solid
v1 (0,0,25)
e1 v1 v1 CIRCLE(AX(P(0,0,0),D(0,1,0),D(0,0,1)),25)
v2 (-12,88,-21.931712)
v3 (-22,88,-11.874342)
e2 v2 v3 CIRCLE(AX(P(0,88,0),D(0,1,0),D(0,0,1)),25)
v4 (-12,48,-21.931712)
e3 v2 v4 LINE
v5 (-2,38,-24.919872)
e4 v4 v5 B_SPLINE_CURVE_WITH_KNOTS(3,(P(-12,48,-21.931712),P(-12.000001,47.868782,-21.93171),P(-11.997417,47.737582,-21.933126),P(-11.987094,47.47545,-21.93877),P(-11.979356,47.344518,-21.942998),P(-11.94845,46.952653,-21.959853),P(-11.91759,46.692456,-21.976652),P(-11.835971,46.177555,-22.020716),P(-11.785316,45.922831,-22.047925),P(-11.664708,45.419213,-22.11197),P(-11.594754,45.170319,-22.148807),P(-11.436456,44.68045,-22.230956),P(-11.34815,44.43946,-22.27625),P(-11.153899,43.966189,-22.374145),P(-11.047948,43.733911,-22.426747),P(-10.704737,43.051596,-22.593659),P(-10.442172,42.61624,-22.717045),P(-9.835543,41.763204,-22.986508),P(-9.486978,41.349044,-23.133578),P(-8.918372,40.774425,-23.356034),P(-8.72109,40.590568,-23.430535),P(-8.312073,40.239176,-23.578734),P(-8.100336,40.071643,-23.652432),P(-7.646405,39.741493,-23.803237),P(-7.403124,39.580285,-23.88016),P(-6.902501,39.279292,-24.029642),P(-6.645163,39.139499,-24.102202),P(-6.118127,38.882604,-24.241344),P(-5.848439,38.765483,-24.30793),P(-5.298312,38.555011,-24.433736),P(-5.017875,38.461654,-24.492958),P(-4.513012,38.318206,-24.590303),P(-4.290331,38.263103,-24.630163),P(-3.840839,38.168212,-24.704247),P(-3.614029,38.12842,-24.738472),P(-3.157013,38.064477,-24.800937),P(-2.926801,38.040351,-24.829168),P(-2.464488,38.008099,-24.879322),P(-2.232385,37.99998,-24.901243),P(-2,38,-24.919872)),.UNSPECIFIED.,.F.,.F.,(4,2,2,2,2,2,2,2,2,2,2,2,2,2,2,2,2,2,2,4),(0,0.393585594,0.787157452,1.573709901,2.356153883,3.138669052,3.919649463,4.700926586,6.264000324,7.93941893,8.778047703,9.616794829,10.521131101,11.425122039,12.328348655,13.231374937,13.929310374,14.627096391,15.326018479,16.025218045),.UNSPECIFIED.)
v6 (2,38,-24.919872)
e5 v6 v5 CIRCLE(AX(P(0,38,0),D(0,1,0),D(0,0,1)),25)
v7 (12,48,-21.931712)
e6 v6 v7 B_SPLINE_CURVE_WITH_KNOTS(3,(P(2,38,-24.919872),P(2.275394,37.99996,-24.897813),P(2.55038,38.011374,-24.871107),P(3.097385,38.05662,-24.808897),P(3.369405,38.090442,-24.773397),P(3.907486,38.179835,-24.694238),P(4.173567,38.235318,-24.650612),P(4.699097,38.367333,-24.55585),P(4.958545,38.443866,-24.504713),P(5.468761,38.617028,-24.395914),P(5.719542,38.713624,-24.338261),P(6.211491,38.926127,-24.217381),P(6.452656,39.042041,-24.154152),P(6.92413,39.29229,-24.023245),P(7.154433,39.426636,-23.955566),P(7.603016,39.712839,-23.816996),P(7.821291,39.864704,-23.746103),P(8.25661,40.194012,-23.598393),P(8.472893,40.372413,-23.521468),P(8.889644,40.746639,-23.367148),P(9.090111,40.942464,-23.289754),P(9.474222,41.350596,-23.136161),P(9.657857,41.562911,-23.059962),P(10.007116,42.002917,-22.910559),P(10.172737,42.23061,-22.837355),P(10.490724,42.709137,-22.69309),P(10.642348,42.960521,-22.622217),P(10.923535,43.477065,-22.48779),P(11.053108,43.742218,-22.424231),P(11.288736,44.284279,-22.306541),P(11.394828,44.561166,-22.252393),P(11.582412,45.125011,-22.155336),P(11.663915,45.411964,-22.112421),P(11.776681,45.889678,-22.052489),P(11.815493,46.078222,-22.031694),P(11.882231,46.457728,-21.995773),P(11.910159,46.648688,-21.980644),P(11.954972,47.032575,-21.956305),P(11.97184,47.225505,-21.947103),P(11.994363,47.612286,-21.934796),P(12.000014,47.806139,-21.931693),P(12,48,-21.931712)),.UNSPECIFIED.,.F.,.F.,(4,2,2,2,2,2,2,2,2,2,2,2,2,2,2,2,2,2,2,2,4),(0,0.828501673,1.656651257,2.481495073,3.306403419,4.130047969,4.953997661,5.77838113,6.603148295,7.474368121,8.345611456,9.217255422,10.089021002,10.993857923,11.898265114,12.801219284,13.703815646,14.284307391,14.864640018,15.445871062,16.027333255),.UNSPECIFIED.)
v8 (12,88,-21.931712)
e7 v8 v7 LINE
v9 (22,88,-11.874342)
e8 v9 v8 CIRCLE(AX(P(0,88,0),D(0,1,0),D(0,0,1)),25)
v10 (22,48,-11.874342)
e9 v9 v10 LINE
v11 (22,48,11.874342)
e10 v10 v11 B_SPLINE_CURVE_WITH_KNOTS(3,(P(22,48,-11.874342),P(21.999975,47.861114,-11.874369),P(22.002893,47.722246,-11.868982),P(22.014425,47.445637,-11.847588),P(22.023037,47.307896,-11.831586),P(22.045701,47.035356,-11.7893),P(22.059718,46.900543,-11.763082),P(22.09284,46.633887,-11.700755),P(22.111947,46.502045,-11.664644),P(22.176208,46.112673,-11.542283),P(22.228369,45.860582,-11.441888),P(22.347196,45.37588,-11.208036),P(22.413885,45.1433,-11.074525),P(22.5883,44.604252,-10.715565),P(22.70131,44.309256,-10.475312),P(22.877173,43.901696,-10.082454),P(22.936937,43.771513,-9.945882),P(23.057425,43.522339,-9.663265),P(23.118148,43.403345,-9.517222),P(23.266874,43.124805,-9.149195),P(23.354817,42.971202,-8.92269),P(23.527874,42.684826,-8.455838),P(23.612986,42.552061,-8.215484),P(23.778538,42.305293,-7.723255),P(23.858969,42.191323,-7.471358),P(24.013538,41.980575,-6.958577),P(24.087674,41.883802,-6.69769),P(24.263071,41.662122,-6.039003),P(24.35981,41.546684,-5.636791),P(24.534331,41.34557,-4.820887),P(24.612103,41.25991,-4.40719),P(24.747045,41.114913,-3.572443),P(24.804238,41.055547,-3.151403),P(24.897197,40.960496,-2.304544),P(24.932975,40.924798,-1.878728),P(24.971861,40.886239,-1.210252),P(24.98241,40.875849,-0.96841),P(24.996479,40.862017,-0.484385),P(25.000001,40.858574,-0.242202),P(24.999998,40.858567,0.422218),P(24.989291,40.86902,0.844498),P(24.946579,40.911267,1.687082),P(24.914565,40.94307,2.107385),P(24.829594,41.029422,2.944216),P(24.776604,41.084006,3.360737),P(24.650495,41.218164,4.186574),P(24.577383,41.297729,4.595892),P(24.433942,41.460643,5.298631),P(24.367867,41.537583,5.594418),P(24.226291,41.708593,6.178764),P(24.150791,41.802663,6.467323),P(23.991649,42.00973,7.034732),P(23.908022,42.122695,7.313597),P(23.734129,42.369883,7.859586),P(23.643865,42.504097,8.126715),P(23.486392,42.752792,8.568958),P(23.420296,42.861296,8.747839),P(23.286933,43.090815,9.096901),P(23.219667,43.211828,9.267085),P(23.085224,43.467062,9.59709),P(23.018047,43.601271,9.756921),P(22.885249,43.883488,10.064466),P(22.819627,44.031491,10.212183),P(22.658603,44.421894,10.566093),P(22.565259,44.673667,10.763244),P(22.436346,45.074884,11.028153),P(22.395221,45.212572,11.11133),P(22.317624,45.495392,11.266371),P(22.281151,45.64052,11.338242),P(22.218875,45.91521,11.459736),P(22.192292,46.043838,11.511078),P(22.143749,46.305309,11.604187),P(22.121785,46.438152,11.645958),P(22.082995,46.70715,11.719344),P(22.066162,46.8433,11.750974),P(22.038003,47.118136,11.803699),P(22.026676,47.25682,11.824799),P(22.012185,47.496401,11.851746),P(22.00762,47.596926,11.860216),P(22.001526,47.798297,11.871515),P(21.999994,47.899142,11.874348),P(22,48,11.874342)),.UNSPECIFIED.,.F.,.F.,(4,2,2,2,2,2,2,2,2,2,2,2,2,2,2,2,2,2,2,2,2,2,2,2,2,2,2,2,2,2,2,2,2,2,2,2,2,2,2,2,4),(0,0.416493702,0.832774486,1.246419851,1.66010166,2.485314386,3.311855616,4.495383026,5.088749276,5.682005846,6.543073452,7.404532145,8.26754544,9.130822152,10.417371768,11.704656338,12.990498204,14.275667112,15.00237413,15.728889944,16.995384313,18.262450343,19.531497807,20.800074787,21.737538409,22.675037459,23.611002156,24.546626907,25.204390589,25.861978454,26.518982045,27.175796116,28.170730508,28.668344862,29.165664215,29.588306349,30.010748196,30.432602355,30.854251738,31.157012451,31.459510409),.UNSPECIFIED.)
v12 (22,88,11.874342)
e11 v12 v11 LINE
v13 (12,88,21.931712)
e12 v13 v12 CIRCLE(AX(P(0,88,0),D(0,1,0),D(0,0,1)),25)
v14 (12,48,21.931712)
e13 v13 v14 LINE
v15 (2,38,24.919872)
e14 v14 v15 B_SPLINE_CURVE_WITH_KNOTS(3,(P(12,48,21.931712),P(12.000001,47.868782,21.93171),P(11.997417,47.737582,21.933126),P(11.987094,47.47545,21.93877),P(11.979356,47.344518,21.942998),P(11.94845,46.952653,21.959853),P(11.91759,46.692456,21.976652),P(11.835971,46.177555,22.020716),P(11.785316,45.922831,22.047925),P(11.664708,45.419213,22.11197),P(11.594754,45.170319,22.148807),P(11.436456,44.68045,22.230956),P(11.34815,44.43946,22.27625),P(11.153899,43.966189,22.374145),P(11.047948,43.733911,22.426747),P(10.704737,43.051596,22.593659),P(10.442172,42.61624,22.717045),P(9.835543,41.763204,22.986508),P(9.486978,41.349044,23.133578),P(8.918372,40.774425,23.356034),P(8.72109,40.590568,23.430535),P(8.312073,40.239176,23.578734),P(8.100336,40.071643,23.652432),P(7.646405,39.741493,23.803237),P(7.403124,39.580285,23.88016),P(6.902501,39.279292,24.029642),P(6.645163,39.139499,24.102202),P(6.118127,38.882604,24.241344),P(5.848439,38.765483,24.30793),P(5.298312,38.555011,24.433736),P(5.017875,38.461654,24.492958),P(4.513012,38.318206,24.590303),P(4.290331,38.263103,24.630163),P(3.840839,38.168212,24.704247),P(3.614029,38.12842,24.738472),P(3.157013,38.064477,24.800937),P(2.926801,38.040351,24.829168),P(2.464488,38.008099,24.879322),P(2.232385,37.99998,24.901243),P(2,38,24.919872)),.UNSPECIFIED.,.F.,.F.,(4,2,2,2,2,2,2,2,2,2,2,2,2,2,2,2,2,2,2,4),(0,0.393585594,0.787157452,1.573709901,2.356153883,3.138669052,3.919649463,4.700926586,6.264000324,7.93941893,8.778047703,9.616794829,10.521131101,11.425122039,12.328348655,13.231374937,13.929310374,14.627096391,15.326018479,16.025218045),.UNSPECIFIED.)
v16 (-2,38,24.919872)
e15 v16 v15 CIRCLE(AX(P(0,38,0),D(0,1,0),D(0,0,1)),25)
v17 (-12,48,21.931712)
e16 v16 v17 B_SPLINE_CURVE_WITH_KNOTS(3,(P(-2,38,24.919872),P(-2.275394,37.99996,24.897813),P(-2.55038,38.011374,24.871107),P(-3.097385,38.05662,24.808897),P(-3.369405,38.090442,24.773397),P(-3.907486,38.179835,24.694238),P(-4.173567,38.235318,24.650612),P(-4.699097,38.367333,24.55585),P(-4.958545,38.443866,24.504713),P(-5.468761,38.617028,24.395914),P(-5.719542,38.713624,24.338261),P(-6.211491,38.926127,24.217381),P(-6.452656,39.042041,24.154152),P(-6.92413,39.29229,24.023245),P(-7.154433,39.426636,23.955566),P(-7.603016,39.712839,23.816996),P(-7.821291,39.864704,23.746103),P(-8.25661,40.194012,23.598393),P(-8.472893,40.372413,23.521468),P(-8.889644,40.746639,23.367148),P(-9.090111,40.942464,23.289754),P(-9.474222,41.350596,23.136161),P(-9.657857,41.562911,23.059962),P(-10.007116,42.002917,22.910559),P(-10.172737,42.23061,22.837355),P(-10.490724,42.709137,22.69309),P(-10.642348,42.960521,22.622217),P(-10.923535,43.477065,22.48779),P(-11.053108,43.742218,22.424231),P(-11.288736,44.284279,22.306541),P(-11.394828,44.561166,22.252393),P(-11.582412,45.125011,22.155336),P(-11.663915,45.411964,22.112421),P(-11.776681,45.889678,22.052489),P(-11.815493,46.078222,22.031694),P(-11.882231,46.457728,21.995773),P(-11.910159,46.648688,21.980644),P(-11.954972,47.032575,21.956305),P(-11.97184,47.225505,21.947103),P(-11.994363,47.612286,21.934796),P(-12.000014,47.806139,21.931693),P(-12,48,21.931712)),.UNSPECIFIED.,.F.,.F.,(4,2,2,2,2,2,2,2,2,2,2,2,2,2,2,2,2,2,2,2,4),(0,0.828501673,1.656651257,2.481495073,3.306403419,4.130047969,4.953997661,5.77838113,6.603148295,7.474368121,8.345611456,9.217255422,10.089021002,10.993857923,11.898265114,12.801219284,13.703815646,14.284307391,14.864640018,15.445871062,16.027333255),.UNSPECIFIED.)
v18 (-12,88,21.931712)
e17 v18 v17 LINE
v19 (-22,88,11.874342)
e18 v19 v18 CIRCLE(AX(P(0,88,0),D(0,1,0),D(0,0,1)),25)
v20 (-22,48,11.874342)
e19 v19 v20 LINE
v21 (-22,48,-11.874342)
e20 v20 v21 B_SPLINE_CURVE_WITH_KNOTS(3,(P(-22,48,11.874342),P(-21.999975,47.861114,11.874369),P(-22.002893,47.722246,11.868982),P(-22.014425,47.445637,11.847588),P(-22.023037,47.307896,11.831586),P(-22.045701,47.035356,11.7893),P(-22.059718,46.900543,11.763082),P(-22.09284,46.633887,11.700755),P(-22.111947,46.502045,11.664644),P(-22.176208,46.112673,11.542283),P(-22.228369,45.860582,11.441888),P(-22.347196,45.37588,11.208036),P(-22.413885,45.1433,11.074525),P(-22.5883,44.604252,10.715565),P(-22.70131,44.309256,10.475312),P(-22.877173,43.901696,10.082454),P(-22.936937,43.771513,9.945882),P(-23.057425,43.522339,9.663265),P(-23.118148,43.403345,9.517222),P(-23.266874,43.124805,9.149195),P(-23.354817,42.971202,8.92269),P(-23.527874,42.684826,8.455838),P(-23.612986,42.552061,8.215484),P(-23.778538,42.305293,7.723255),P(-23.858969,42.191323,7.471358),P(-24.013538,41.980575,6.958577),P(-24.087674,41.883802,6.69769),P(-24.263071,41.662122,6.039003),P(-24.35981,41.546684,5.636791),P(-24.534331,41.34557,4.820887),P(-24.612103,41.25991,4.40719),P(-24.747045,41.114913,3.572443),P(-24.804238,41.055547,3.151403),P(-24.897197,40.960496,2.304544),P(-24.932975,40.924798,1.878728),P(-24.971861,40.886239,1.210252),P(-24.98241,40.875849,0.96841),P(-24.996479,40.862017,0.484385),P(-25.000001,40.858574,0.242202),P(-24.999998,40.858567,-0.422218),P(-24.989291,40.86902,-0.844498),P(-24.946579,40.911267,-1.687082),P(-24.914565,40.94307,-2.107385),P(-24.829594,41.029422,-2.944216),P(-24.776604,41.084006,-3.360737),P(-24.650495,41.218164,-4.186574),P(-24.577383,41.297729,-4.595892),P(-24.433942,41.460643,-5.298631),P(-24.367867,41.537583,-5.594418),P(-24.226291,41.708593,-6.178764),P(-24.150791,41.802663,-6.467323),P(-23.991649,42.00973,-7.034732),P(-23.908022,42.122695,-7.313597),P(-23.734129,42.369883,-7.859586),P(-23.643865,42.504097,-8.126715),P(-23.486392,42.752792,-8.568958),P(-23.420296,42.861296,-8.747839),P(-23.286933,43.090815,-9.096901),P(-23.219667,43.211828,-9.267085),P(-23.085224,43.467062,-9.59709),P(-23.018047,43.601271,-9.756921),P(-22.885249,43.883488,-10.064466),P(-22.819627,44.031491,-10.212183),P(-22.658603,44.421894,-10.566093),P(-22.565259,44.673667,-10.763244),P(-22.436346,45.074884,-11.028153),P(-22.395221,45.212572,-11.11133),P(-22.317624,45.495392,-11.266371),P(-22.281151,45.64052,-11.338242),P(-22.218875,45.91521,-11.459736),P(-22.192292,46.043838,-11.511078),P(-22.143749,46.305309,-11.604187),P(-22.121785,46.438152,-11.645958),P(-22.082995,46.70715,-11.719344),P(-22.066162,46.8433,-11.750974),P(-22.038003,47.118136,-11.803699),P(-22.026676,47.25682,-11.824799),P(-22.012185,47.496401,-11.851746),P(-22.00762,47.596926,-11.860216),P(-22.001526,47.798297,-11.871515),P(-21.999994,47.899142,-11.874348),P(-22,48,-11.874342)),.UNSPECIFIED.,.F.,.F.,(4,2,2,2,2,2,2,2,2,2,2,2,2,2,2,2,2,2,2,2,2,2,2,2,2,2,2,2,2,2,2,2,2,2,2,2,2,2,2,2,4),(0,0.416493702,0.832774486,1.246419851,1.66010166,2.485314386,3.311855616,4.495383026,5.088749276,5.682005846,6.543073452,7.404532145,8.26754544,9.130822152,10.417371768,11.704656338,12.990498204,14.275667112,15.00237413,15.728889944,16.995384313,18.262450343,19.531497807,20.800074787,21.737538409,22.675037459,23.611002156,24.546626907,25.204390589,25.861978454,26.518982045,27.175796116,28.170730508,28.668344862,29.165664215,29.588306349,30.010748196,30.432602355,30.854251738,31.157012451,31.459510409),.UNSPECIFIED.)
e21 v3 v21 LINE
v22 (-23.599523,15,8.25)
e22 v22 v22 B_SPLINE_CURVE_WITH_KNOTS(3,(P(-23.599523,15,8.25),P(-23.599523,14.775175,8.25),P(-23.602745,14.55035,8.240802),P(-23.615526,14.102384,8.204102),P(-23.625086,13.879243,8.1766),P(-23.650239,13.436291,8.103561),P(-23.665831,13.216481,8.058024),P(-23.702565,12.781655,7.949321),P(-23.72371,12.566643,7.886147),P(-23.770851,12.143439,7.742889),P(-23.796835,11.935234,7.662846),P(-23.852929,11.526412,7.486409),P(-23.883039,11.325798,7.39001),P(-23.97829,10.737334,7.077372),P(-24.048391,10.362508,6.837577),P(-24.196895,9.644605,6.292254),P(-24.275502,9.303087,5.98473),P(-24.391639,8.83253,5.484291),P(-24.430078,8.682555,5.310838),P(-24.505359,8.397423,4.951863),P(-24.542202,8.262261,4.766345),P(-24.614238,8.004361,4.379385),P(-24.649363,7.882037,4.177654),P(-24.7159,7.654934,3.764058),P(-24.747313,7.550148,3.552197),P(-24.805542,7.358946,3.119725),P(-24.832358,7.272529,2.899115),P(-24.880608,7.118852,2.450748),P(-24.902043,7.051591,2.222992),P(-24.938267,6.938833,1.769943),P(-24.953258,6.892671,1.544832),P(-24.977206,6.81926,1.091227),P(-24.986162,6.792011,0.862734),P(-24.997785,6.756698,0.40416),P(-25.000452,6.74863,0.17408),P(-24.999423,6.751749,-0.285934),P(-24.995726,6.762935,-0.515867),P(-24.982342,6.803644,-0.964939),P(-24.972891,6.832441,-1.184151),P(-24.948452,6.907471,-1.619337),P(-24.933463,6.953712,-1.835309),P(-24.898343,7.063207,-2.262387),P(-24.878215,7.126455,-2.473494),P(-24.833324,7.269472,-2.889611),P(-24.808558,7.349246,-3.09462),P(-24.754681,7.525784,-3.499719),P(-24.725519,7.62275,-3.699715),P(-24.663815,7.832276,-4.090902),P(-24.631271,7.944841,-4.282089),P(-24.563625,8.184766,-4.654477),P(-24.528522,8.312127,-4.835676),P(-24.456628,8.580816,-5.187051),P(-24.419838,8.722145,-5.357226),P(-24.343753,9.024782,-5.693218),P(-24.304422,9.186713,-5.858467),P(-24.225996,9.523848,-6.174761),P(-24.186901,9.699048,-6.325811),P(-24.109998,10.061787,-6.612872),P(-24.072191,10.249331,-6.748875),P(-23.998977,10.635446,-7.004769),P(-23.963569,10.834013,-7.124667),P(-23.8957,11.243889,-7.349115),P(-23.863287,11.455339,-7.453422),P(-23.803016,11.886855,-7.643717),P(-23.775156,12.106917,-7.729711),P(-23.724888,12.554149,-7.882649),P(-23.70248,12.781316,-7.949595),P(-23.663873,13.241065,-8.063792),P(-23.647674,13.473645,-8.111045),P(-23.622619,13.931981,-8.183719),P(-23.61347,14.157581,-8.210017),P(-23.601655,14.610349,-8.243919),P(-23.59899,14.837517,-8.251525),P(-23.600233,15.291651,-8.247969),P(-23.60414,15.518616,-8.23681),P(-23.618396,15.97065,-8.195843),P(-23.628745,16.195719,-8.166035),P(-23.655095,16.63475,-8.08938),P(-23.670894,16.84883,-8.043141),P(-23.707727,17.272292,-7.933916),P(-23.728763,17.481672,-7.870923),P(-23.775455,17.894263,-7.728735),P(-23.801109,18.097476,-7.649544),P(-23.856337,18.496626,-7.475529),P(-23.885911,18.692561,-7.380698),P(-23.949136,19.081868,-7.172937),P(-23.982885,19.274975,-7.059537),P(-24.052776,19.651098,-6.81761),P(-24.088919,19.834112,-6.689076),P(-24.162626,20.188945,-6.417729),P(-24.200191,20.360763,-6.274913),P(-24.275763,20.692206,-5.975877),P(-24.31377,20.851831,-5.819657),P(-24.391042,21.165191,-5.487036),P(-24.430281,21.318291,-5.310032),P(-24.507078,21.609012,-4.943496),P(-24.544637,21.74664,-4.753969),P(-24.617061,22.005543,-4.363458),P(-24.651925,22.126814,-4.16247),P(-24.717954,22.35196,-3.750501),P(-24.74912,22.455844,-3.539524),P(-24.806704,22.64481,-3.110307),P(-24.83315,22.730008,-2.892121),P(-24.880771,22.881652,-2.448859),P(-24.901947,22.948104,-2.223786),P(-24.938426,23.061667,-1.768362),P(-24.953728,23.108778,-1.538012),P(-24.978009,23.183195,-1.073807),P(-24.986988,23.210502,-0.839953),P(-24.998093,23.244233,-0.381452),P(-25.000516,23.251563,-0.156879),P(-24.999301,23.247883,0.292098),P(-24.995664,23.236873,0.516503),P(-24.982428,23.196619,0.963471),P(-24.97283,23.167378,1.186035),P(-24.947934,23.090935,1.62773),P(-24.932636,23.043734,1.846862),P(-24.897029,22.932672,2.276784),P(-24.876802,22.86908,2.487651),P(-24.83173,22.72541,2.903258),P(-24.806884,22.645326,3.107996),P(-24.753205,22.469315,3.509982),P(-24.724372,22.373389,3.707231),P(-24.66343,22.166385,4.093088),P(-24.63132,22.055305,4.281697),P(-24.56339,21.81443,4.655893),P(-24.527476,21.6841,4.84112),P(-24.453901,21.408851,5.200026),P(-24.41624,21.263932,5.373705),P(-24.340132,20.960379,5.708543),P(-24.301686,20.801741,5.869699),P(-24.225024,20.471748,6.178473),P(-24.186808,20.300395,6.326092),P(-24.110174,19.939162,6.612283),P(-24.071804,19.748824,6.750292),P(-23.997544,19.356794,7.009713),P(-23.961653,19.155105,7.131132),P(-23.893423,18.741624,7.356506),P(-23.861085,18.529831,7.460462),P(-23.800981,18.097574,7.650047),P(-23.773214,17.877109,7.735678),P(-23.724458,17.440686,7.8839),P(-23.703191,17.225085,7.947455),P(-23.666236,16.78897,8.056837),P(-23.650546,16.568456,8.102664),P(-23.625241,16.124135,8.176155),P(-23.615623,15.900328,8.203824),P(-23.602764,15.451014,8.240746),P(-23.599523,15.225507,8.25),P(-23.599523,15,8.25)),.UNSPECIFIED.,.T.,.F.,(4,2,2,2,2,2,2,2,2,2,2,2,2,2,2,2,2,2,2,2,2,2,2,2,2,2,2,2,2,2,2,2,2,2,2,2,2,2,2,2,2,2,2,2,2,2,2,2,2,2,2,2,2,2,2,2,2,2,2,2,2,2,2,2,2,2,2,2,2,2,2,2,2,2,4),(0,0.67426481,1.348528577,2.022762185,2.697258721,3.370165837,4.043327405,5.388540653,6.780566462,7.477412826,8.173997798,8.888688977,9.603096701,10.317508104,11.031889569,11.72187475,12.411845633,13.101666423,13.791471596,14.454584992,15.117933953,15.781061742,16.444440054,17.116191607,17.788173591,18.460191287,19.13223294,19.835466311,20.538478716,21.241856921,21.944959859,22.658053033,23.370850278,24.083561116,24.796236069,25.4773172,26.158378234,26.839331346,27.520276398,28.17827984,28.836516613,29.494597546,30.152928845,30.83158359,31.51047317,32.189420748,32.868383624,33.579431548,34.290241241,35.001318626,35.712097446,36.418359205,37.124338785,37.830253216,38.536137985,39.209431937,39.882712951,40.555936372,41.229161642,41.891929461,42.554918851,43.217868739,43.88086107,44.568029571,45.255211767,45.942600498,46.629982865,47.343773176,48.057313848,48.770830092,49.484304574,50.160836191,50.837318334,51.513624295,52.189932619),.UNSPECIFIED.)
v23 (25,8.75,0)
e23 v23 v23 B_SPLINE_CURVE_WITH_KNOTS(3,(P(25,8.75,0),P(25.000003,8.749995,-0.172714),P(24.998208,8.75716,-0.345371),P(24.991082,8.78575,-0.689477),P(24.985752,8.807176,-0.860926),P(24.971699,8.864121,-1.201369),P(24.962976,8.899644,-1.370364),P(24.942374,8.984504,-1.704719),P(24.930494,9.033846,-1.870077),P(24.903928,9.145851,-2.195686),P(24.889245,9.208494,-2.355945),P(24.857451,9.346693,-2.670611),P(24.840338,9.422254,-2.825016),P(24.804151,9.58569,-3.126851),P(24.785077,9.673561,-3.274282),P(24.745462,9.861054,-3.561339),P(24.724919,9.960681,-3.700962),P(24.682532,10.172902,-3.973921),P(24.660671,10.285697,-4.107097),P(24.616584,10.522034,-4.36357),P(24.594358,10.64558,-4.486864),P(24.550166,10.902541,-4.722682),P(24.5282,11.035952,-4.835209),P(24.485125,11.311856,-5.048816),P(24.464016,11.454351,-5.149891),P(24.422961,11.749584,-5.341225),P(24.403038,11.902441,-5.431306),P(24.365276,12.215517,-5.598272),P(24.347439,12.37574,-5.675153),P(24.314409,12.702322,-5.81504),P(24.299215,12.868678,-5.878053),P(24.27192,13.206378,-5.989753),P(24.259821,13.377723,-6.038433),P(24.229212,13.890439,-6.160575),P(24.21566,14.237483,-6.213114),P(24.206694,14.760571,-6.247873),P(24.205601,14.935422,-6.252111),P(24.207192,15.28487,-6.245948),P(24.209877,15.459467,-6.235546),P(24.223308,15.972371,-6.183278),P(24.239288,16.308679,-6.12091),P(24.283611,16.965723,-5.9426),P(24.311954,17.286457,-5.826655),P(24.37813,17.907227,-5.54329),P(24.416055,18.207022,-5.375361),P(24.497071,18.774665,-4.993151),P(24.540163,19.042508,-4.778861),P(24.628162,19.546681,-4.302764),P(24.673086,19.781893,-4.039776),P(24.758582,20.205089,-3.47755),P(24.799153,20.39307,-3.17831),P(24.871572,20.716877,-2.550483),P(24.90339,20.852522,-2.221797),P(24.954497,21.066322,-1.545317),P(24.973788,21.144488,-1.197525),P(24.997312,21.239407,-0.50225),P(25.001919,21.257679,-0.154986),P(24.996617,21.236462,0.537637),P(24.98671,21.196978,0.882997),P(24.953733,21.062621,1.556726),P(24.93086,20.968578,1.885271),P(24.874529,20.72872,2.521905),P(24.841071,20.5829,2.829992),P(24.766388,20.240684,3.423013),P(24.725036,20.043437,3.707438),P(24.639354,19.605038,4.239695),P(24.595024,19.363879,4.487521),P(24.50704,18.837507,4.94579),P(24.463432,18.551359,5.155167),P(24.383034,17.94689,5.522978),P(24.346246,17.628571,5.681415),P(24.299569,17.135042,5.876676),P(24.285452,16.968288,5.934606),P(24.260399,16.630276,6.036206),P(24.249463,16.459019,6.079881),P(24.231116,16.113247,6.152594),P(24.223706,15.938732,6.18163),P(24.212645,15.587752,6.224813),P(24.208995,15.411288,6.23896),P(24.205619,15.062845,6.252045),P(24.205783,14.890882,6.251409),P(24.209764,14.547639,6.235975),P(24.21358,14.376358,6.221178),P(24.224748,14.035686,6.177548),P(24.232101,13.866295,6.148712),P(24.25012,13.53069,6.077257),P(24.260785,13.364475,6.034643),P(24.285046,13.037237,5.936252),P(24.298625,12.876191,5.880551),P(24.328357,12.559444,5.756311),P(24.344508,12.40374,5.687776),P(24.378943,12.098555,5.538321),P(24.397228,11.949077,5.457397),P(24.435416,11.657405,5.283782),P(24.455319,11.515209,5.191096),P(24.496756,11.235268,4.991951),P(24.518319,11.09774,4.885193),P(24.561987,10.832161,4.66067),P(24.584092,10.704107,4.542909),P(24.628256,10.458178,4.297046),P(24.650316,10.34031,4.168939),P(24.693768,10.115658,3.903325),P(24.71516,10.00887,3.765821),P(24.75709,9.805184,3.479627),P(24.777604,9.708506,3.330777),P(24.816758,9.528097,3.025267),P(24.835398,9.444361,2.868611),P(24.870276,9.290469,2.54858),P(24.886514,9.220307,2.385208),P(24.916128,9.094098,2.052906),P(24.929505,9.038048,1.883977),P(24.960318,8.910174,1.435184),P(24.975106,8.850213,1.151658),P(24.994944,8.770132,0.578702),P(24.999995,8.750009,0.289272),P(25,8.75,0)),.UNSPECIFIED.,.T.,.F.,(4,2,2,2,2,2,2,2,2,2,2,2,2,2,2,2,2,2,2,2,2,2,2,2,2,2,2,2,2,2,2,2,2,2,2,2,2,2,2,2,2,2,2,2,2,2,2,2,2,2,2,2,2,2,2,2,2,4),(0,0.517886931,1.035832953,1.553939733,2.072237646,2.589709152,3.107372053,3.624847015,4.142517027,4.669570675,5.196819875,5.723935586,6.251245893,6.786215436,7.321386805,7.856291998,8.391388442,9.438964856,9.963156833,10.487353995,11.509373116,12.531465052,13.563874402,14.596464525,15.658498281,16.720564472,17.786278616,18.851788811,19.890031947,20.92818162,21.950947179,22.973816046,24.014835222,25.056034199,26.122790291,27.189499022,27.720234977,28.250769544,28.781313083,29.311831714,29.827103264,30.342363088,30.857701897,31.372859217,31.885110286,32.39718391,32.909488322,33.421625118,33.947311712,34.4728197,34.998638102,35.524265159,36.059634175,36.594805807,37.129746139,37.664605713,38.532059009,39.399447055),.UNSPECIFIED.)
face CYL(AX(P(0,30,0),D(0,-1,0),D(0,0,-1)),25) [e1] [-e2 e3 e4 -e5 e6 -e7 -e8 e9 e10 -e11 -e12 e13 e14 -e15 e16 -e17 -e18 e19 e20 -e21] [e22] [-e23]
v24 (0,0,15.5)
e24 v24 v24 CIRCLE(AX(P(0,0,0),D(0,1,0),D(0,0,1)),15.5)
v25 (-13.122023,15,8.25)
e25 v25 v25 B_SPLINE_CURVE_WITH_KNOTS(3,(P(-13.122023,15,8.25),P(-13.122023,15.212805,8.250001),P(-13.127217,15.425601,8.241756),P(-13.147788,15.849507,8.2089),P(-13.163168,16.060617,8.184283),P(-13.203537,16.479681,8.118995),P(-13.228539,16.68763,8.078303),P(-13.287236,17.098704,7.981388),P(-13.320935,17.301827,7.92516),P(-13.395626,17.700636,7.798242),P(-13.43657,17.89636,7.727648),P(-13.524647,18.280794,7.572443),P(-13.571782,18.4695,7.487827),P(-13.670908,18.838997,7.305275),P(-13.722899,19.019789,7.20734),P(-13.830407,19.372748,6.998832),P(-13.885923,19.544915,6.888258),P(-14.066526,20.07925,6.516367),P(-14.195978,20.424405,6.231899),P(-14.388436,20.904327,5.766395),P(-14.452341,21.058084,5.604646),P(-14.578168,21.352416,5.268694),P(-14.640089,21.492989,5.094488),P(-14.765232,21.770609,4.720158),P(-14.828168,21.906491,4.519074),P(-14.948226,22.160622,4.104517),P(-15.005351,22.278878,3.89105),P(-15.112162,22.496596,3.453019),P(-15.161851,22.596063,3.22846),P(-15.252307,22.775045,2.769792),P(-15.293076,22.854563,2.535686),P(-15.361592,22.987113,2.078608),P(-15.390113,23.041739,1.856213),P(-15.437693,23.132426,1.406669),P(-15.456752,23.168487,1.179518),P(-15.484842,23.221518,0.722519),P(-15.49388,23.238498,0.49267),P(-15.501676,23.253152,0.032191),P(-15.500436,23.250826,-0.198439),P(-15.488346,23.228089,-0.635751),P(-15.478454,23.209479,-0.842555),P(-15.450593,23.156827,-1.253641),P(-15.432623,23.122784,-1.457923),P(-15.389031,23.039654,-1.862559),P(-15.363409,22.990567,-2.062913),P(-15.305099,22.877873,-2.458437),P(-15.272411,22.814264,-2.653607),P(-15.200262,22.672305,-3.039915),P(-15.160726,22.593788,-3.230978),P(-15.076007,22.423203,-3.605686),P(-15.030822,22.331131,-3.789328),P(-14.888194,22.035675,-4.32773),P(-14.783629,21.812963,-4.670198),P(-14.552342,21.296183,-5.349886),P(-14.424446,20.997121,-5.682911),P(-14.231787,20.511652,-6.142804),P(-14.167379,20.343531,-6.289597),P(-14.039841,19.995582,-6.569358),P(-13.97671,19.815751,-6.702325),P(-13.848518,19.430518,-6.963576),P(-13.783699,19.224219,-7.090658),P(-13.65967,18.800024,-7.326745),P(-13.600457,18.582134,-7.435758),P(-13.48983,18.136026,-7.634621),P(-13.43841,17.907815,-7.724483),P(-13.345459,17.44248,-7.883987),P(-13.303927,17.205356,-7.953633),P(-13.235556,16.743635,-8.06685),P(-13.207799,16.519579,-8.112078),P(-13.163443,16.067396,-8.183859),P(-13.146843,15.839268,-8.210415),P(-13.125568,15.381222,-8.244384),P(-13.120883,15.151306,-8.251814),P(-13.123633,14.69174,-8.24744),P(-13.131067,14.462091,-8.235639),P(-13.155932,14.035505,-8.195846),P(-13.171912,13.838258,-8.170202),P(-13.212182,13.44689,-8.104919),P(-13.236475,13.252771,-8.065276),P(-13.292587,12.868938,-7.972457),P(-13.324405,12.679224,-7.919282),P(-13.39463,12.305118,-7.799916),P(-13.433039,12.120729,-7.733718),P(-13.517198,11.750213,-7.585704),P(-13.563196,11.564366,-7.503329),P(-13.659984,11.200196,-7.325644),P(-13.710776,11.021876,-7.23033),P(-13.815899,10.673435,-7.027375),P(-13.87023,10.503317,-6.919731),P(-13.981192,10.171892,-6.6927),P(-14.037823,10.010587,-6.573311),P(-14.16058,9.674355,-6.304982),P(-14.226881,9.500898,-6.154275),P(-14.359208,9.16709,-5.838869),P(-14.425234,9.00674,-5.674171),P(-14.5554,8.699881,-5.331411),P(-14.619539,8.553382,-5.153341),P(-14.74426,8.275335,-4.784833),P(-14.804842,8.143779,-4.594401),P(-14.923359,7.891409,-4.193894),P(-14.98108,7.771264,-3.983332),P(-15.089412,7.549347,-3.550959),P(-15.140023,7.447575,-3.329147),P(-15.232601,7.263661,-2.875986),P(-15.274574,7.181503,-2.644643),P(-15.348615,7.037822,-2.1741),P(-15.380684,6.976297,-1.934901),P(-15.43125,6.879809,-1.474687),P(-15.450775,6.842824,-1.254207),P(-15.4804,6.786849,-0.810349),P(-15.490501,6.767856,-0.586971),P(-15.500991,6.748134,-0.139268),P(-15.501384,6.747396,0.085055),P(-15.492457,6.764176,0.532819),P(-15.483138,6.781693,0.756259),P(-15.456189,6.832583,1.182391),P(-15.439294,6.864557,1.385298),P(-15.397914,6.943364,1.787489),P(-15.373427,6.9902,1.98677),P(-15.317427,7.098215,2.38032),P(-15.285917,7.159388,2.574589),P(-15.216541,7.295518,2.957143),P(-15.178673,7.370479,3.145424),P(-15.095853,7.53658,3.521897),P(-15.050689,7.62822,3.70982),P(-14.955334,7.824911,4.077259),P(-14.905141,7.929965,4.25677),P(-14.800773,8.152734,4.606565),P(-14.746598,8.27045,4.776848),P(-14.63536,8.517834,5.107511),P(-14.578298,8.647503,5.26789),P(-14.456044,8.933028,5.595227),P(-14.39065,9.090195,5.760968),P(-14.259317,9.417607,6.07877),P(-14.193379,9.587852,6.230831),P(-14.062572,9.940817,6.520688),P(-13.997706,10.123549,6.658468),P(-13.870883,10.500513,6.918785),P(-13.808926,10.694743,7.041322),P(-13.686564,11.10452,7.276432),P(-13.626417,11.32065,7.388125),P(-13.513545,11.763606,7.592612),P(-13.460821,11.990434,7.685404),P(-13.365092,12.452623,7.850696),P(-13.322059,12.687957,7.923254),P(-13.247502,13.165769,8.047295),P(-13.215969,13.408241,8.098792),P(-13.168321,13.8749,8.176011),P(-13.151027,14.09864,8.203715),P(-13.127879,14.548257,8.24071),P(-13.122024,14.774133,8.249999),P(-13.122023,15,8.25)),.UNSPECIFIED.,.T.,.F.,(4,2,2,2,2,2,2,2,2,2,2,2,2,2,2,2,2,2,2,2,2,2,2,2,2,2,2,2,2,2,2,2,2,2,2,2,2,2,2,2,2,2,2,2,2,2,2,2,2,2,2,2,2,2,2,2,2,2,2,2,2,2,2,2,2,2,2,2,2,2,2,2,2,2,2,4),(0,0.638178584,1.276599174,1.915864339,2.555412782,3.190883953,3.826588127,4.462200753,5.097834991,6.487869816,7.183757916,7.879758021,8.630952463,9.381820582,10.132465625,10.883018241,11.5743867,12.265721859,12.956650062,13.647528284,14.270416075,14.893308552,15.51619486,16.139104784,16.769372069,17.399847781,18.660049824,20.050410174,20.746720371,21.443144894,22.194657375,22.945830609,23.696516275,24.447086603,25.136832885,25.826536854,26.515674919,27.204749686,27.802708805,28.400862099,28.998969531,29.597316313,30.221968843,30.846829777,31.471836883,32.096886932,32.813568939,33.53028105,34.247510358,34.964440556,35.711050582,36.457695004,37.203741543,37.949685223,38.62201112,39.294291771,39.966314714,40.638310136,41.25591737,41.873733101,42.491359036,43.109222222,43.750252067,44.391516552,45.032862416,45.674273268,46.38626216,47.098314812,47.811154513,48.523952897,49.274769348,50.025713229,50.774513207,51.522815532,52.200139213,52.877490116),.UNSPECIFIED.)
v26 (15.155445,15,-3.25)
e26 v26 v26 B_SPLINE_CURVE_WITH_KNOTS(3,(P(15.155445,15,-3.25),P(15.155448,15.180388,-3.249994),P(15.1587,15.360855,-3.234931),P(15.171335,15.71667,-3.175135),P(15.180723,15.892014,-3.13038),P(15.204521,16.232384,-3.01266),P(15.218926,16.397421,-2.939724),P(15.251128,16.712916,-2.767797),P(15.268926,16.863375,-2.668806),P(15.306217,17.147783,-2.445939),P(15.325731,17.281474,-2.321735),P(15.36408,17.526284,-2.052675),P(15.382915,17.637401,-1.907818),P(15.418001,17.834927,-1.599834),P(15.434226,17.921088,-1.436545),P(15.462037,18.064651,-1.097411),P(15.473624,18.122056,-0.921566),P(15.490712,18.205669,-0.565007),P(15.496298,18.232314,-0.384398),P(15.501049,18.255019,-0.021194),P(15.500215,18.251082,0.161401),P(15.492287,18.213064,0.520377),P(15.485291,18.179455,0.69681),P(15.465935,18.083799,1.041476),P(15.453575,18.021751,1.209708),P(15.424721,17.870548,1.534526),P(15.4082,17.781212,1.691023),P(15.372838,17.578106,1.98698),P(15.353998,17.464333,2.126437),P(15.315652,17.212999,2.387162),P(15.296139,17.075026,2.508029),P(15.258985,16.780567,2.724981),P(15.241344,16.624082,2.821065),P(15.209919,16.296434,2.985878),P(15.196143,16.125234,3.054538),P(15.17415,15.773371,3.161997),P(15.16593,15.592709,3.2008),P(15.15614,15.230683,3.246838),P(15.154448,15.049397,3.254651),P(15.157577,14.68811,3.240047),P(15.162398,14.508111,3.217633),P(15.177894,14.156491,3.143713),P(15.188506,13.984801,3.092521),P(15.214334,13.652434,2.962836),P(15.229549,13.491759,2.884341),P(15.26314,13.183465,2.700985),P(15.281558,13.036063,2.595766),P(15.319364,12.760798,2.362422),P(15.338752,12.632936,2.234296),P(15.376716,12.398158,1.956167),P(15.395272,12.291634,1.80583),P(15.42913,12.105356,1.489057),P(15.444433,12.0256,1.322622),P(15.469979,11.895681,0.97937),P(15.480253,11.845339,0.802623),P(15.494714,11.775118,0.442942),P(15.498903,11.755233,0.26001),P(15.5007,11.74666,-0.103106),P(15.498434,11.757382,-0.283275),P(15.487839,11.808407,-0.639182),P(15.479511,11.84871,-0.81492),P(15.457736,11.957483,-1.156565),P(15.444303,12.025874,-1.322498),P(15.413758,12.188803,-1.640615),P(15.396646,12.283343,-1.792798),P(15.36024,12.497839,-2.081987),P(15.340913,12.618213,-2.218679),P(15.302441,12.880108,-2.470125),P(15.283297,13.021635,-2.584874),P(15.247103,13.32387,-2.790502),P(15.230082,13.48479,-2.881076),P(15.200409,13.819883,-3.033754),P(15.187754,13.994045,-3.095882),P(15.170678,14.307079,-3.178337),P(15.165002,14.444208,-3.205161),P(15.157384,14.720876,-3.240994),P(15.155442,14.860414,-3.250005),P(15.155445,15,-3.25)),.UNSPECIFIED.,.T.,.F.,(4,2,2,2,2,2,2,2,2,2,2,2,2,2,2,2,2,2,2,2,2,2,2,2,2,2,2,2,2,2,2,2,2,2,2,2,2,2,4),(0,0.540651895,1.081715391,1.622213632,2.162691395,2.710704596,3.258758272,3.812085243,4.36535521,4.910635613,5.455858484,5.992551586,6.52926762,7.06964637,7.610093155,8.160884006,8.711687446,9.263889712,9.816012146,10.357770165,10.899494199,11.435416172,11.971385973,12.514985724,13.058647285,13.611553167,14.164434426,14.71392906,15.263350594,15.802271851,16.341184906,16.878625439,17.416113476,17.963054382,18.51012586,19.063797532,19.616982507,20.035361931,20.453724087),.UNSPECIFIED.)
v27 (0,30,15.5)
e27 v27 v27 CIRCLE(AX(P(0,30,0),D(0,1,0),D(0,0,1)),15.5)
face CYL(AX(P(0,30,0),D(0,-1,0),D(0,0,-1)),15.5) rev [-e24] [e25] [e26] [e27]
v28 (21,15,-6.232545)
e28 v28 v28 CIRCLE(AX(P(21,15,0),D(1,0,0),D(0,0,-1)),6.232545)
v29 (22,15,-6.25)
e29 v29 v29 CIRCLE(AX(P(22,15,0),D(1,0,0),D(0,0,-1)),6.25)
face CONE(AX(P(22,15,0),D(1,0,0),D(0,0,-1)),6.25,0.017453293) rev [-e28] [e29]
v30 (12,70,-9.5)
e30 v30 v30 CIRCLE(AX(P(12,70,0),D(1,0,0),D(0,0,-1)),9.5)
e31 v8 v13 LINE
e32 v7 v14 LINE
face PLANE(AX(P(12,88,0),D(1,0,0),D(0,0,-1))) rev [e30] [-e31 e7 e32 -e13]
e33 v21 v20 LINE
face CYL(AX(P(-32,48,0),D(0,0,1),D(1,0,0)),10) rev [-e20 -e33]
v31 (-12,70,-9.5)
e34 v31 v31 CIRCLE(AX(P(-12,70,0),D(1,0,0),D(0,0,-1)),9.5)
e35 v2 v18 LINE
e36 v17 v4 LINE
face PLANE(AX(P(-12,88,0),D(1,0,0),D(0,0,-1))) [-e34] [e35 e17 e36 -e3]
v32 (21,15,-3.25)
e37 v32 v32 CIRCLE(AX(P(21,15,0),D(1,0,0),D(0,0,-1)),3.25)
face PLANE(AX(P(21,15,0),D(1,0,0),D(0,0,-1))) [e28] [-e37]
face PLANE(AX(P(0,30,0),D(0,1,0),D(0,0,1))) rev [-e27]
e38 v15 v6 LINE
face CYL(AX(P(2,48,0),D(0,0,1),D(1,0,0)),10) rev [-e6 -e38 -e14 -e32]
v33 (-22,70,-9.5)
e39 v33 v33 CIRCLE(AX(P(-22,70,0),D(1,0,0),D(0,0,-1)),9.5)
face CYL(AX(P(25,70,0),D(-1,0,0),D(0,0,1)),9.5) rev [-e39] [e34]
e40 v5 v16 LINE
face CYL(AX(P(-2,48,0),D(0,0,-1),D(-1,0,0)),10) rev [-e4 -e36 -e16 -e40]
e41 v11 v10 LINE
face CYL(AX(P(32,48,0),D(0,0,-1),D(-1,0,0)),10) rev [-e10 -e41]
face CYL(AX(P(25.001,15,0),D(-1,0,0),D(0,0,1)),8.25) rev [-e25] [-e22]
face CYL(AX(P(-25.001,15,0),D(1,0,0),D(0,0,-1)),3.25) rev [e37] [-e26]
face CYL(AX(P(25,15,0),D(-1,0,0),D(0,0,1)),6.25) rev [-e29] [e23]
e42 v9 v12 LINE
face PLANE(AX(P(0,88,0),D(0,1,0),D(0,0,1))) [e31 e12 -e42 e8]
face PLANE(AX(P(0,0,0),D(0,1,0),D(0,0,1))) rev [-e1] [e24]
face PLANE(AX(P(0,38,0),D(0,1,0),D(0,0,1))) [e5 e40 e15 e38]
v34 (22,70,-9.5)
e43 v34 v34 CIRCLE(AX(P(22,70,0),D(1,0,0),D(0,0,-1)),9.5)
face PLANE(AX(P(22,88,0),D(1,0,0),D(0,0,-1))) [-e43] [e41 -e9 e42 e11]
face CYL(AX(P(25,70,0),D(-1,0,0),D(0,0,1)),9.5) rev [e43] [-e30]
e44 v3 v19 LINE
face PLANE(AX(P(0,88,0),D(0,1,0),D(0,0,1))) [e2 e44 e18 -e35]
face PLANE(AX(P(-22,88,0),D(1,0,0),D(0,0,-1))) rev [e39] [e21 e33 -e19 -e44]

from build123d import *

# Parameters (mm, degrees)
SKETCH1_R                           = 25
SKETCH1_R_2                         = 15.5
BOSS_EXTRUDE1_DEPTH                 = 30
SKETCH3_R                           = 25
BOSS_EXTRUDE2_DEPTH                 = 8
BOSS_EXTRUDE3_DEPTH                 = 50
CUT_EXTRUDE1_DEPTH                  = 103.849404471
CUT_EXTRUDE1_DEPTH_BACK             = 103.849404471
SKETCH6_R                           = 9.5
FILLET2_R                           = 10
CUT_EXTRUDE2_REACH                  = 104.849
CUT_EXTRUDE2_END_RADIUS             = 25
SKETCH7_R                           = 8.25
CUT_EXTRUDE2_DIRECTION_2_REACH      = 104.849
CUT_EXTRUDE2_DIRECTION_2_END_RADIUS = 15.5
SKETCH8_R                           = 6.25
CUT_EXTRUDE3_DEPTH                  = 103.849404626
CUT_EXTRUDE3_OTHER_WAY_DEPTH        = 1
CUT_EXTRUDE3_OTHER_WAY_TAPER        = 1
CUT_EXTRUDE4_REACH                  = 104.396
CUT_EXTRUDE4_END_RADIUS             = 15.5
SKETCH9_R                           = 3.25


with BuildPart() as part:
    # Sketch1 → Boss-Extrude1 (new body)
    with BuildSketch(Plane(origin=(0, 0, 0), x_dir=(1, 0, 0), z_dir=(0, 1, 0))):
        with Locations(Location((0, 0, 0), (0, 0, 270))):
            Circle(SKETCH1_R)
        with Locations(Location((0, 0, 0), (0, 0, 270))):
            Circle(SKETCH1_R_2, mode=Mode.SUBTRACT)
    extrude(amount=BOSS_EXTRUDE1_DEPTH)

    # Sketch3 → Boss-Extrude2 (add)
    with BuildSketch(Plane(origin=(0, 30, 0), x_dir=(1, 0, 0), z_dir=(0, 1, 0))):
        with Locations(Location((0, 0, 0), (0, 0, 270))):
            Circle(SKETCH3_R)
    extrude(amount=BOSS_EXTRUDE2_DEPTH)

    # Sketch4 → Boss-Extrude3 (add)
    with BuildSketch(Plane(origin=(0, 38, 0), x_dir=(1, 0, 0), z_dir=(0, 1, 0))):
        with BuildLine():
            Line((-12, -21.931712199), (-12, 21.931712199))
            ThreePointArc((-12, 21.931712199), (-17.728160463, 17.627033971), (-22, 11.874342087))
            Line((-22, 11.874342087), (-22, -11.874342087))
            ThreePointArc((-22, -11.874342087), (-17.728160463, -17.627033971), (-12, -21.931712199))
        make_face()
        with BuildLine():
            ThreePointArc((22, 11.874342087), (17.728160463, 17.627033971), (12, 21.931712199))
            Line((12, 21.931712199), (12, -21.931712199))
            ThreePointArc((12, -21.931712199), (17.728160463, -17.627033971), (22, -11.874342087))
            Line((22, -11.874342087), (22, 11.874342087))
        make_face()
    extrude(amount=BOSS_EXTRUDE3_DEPTH)

    # Sketch6 → Cut-Extrude1 (cut, two sides: drawn at the far end of the back side and taken through both)
    with BuildSketch(Plane.ZY.offset(22).offset(-CUT_EXTRUDE1_DEPTH_BACK)):
        with Locations(Location((0, 70, 0), (0, 0, 180))):
            Circle(SKETCH6_R)
    extrude(amount=CUT_EXTRUDE1_DEPTH + CUT_EXTRUDE1_DEPTH_BACK, mode=Mode.SUBTRACT)

    # Fillet2
    # the kernel refuses this fillet: 10 mm, written as the material it adds along each edge
    with BuildSketch(Plane(origin=(-22, 38, -36.874342087), x_dir=(-1, 0, 0), z_dir=(0, 0, 1))) as fillet2_piece_1_section:
        with BuildLine():
            CenterArc((FILLET2_R, -FILLET2_R), FILLET2_R, 90, 90)
            Line((0, -FILLET2_R), (0, 0))
            Line((0, 0), (FILLET2_R, 0))
        make_face()
    fillet2_piece_1 = extrude(amount=73.748684174, mode=Mode.PRIVATE)
    fillet2_piece_1 = fillet2_piece_1 & Plane(origin=(0, 41.226834709, 0), x_dir=(0, 0, 1), z_dir=(0, -1, 0)) * Cylinder(25, 188, mode=Mode.PRIVATE)
    add(fillet2_piece_1)
    with BuildSketch(Plane(origin=(-12, 38, 46.931712199), x_dir=(1, 0, 0), z_dir=(0, 0, -1))) as fillet2_piece_2_section:
        with BuildLine():
            CenterArc((FILLET2_R, -FILLET2_R), FILLET2_R, 90, 90)
            Line((0, -FILLET2_R), (0, 0))
            Line((0, 0), (FILLET2_R, 0))
        make_face()
    fillet2_piece_2 = extrude(amount=93.863424399, mode=Mode.PRIVATE)
    fillet2_piece_2 = fillet2_piece_2 & Plane(origin=(0, 40.21683264, 0), x_dir=(0, 0, 1), z_dir=(0, -1, 0)) * Cylinder(25, 228, mode=Mode.PRIVATE)
    add(fillet2_piece_2)
    with BuildSketch(Plane(origin=(12, 38, -46.931712199), x_dir=(-1, 0, 0), z_dir=(0, 0, 1))) as fillet2_piece_3_section:
        with BuildLine():
            CenterArc((FILLET2_R, -FILLET2_R), FILLET2_R, 90, 90)
            Line((0, -FILLET2_R), (0, 0))
            Line((0, 0), (FILLET2_R, 0))
        make_face()
    fillet2_piece_3 = extrude(amount=93.863424399, mode=Mode.PRIVATE)
    fillet2_piece_3 = fillet2_piece_3 & Plane(origin=(0, 40.21683264, 0), x_dir=(0, 0, 1), z_dir=(0, -1, 0)) * Cylinder(25, 228, mode=Mode.PRIVATE)
    add(fillet2_piece_3)
    with BuildSketch(Plane(origin=(22, 38, 36.874342087), x_dir=(0, 1, 0), z_dir=(0, 0, -1))) as fillet2_piece_4_section:
        with BuildLine():
            CenterArc((FILLET2_R, FILLET2_R), FILLET2_R, 180, 90)
            Line((0, FILLET2_R), (0, 0))
            Line((0, 0), (FILLET2_R, 0))
        make_face()
    fillet2_piece_4 = extrude(amount=73.748684174, mode=Mode.PRIVATE)
    fillet2_piece_4 = fillet2_piece_4 & Plane(origin=(0, 41.226834878, 0), x_dir=(0, 0, 1), z_dir=(0, -1, 0)) * Cylinder(25, 188, mode=Mode.PRIVATE)
    add(fillet2_piece_4)

    # Cut-Extrude2: up to this cylinder (the profile starts inside it)
    cut_extrude2_end = Plane(origin=(0, 15, 0), z_dir=(0, -1, 0)) * Cylinder(CUT_EXTRUDE2_END_RADIUS, 260.698, mode=Mode.PRIVATE)
    # Sketch7 → Cut-Extrude2 (cut, up to the surface)
    with BuildSketch(Plane.ZY.offset(22), mode=Mode.PRIVATE) as cut_extrude2_sk1:
        with Locations((0, 15)):
            Circle(SKETCH7_R)
    cut_extrude2_tool1 = extrude(cut_extrude2_sk1.sketch, amount=CUT_EXTRUDE2_REACH, mode=Mode.PRIVATE) & cut_extrude2_end
    add(cut_extrude2_tool1.solids().sort_by_distance((-22, 15, 0))[0], mode=Mode.SUBTRACT)

    # Cut-Extrude2 direction 2: up to this cylinder (the profile starts outside it)
    cut_extrude2_direction_2_end = Plane(origin=(0, 15, 0), z_dir=(0, -1, 0)) * Cylinder(CUT_EXTRUDE2_DIRECTION_2_END_RADIUS, 241.698, mode=Mode.PRIVATE)
    # Sketch7 → Cut-Extrude2 direction 2 (cut, up to the surface)
    with BuildSketch(Plane.ZY.offset(22), mode=Mode.PRIVATE) as cut_extrude2_direction_2_sk1:
        with Locations((0, 15)):
            Circle(SKETCH7_R)
    cut_extrude2_direction_2_tool1 = extrude(cut_extrude2_direction_2_sk1.sketch, amount=-CUT_EXTRUDE2_DIRECTION_2_REACH, mode=Mode.PRIVATE) - cut_extrude2_direction_2_end
    add(cut_extrude2_direction_2_tool1.solids().sort_by_distance((-22, 15, 0))[0], mode=Mode.SUBTRACT)

    # Sketch8 → Cut-Extrude3 (cut)
    with BuildSketch(Plane(origin=(22, 0, 0), x_dir=(0, 0, -1), z_dir=(1, 0, 0))):
        with Locations(Location((0, 15, 0), (0, 0, 270))):
            Circle(SKETCH8_R)
    extrude(amount=CUT_EXTRUDE3_DEPTH, mode=Mode.SUBTRACT)

    # Sketch8 → Cut-Extrude3 other way (cut)
    with BuildSketch(Plane(origin=(22, 0, 0), x_dir=(0, 0, -1), z_dir=(1, 0, 0))):
        with Locations(Location((0, 15, 0), (0, 0, 270))):
            Circle(SKETCH8_R)
    extrude(amount=-CUT_EXTRUDE3_OTHER_WAY_DEPTH, taper=CUT_EXTRUDE3_OTHER_WAY_TAPER, mode=Mode.SUBTRACT)

    # Cut-Extrude4: up to this cylinder (the profile starts outside it)
    cut_extrude4_end = Plane(origin=(0, 15, 0), z_dir=(0, -1, 0)) * Cylinder(CUT_EXTRUDE4_END_RADIUS, 240.792, mode=Mode.PRIVATE)
    # Sketch9 → Cut-Extrude4 (cut, up to the surface)
    with BuildSketch(Plane(origin=(21, 0, 0), x_dir=(0, 0, -1), z_dir=(1, 0, 0)), mode=Mode.PRIVATE) as cut_extrude4_sk1:
        with Locations((0, 15)):
            Circle(SKETCH9_R)
    cut_extrude4_tool1 = extrude(cut_extrude4_sk1.sketch, amount=-CUT_EXTRUDE4_REACH, mode=Mode.PRIVATE) - cut_extrude4_end
    add(cut_extrude4_tool1.solids().sort_by_distance((21, 15, 0))[0], mode=Mode.SUBTRACT)


solid = part.part
